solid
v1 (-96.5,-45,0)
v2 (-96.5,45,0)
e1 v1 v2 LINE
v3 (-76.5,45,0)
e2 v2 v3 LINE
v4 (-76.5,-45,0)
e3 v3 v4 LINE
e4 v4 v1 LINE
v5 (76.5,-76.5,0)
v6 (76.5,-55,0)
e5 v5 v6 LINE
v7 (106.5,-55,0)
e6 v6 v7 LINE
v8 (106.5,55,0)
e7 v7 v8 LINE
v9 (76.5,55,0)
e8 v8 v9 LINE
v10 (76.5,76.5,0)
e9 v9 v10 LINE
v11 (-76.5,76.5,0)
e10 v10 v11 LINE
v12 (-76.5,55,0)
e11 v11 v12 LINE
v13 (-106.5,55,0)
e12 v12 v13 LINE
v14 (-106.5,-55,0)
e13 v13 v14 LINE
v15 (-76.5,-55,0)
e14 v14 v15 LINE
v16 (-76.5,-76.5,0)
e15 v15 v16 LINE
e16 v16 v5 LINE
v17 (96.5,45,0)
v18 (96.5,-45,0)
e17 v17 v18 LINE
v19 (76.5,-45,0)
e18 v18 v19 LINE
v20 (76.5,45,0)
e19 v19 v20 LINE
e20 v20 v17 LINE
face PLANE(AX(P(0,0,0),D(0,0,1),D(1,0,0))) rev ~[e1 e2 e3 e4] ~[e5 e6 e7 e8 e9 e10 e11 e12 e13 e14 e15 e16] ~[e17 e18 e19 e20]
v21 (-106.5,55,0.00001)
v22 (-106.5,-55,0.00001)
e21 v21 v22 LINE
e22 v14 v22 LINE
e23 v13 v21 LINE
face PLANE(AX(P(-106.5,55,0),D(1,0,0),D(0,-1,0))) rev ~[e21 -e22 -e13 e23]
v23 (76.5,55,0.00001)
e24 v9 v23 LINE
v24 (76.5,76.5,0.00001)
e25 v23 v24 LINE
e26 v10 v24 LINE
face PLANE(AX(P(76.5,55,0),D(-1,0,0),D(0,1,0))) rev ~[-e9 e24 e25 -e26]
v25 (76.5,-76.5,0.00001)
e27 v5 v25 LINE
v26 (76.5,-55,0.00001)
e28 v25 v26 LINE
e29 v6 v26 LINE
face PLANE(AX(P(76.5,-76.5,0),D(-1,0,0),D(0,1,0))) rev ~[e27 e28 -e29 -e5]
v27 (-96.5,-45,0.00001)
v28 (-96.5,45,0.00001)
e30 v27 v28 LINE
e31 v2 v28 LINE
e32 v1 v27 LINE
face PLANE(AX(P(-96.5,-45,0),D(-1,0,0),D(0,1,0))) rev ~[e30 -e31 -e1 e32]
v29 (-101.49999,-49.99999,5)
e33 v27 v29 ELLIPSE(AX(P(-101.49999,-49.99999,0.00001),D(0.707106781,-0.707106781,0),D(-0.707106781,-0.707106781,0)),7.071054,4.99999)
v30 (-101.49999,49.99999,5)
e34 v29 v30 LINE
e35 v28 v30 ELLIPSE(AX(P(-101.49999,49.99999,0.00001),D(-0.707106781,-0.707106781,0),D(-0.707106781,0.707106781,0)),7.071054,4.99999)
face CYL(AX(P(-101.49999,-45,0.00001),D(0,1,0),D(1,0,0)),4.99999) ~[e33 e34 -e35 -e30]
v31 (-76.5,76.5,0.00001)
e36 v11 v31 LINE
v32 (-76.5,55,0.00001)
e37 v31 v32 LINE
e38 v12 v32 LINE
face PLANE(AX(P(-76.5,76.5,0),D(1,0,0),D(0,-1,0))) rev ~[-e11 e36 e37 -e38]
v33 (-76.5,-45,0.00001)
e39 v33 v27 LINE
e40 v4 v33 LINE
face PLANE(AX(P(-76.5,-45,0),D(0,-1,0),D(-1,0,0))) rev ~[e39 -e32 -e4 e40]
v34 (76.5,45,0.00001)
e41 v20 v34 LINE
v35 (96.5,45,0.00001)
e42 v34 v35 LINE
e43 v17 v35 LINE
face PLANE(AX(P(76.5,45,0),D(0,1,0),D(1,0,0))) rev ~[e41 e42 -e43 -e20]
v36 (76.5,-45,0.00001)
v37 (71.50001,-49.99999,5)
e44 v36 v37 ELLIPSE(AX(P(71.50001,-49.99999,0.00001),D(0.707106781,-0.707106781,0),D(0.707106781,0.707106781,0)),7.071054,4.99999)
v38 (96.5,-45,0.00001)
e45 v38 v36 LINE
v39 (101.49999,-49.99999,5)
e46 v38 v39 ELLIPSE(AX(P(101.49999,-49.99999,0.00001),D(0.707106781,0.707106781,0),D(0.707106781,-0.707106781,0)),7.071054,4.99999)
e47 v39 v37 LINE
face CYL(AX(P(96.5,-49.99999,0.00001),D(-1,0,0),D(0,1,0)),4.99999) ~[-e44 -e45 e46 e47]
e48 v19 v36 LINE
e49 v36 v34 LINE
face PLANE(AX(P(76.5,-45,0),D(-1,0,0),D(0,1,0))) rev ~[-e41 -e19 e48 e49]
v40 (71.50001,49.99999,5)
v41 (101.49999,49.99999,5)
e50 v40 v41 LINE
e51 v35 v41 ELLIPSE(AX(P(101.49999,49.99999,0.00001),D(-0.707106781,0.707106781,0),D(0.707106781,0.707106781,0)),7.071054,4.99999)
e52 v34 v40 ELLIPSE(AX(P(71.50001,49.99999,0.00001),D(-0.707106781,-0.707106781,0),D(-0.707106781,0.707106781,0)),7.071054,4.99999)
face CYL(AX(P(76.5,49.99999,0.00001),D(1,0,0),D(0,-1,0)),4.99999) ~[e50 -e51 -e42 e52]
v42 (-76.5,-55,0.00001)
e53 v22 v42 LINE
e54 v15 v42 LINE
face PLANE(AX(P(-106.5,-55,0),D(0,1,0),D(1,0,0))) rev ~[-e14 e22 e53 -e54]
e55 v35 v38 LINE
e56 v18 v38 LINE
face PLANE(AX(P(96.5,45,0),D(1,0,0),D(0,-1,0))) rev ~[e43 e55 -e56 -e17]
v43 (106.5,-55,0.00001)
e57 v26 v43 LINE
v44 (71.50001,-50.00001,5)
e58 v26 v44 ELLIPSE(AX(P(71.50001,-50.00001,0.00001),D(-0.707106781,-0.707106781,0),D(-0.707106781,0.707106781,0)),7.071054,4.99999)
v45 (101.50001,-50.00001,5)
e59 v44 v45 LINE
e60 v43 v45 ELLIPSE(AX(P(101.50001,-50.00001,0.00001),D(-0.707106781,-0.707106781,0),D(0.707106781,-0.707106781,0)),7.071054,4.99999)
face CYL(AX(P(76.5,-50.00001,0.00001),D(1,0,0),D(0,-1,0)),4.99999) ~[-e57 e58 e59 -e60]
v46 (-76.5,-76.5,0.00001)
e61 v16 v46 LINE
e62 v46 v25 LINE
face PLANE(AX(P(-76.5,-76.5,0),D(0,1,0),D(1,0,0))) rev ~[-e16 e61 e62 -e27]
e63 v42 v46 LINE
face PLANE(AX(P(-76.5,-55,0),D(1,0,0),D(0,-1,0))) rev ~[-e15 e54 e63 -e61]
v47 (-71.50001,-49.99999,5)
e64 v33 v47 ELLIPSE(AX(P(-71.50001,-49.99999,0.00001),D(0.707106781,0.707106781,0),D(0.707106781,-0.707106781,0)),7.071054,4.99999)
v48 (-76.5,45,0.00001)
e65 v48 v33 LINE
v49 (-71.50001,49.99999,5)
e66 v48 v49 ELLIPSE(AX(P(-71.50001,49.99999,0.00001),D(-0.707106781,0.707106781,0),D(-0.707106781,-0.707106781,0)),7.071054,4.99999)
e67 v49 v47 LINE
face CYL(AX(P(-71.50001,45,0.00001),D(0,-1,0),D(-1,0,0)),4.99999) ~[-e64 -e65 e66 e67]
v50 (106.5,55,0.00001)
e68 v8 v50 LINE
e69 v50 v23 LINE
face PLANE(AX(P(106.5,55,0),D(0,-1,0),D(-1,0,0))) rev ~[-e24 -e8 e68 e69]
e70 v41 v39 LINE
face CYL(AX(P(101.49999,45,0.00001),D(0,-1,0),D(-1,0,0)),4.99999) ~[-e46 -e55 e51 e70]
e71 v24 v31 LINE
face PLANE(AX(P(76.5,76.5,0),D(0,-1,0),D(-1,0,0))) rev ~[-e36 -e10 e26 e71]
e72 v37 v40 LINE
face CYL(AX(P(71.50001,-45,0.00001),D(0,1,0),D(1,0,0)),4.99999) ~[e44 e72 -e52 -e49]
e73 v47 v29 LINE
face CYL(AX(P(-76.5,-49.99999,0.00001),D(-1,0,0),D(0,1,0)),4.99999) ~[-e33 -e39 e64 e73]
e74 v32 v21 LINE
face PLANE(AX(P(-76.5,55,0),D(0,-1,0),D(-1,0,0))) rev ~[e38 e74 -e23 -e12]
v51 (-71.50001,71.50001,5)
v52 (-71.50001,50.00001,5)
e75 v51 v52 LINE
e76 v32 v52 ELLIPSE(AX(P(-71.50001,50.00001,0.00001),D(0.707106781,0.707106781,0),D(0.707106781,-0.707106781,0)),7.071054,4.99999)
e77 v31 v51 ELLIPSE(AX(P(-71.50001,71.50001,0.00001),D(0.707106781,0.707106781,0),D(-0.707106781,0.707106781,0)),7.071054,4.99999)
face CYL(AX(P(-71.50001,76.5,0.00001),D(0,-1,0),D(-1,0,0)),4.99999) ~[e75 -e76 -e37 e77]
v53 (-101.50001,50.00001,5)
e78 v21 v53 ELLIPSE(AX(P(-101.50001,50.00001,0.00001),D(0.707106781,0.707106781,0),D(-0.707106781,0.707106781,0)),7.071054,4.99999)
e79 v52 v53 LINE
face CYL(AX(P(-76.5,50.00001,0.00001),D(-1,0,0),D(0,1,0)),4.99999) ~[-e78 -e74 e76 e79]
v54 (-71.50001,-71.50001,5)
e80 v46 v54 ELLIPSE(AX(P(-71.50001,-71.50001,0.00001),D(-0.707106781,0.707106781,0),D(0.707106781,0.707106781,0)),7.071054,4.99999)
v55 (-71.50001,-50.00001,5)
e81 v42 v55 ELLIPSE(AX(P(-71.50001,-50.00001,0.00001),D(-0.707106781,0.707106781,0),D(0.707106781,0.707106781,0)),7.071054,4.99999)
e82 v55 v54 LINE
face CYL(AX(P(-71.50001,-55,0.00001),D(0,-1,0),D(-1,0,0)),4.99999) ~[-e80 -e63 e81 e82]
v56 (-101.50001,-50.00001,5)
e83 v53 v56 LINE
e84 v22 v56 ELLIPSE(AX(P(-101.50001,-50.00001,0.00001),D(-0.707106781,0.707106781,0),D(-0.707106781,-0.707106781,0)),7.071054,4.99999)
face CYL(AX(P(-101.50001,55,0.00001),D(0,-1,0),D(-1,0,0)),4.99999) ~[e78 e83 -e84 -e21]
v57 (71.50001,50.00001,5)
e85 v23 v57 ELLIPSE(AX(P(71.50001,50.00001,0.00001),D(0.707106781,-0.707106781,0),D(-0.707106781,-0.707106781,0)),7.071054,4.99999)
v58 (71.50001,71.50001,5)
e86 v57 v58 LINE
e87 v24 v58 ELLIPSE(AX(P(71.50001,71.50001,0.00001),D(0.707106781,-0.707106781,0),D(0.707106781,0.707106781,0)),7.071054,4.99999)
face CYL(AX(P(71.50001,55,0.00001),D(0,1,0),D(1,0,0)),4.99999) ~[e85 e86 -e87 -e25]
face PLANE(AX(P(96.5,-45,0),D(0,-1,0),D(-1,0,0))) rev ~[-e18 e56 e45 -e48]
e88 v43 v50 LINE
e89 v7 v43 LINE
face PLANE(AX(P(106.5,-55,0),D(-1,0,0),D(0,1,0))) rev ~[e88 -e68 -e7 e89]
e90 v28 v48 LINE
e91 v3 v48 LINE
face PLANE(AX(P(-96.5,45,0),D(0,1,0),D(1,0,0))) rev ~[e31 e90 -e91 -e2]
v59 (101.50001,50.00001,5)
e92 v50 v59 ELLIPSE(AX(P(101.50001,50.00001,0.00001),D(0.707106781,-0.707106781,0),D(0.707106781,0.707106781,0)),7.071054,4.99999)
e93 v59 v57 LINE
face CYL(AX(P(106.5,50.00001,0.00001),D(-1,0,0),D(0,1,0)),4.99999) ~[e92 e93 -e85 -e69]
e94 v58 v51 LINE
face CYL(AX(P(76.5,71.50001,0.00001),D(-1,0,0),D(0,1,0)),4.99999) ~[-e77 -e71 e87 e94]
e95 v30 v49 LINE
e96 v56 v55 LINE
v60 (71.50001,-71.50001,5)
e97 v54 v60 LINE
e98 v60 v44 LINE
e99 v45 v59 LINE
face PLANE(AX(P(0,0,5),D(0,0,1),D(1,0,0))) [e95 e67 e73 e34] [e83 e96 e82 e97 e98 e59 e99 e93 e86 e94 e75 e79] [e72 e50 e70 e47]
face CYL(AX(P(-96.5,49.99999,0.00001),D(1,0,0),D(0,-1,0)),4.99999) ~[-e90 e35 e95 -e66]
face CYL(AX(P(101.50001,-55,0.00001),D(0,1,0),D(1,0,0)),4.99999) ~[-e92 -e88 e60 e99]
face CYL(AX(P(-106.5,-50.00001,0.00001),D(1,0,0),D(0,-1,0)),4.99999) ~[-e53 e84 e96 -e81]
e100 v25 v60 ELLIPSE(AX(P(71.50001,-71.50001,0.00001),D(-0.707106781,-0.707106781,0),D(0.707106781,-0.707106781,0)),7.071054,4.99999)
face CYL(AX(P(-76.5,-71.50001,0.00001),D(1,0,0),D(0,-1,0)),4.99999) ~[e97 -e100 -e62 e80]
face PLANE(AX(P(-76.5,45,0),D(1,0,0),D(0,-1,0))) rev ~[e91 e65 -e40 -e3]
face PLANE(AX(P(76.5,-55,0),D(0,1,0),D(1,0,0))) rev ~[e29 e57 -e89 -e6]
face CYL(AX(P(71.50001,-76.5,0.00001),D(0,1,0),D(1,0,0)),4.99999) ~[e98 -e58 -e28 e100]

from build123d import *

# Parameters (mm, degrees)
F2_DEPTH = 5
F3_R     = 4.99999


# Not quite as in the source:
# - a fillet or chamfer is up to 0.001 mm smaller than in the source, because OpenCascade refuses the exact size


with BuildPart() as f2:
    # F1 (on Top) → F2 (new body)
    with BuildSketch(Plane.XY):
        Polygon((-76.5, -76.5), (76.5, -76.5), (76.5, -55), (76.5, -45), (76.5, 45), (76.5, 55), (76.5, 76.5), (-76.5, 76.5), (-76.5, 55), (-76.5, 45), (-76.5, -45), (-76.5, -55), align=None)
        Polygon((76.5, -45), (76.5, -55), (106.5, -55), (106.5, 55), (76.5, 55), (76.5, 45), (96.5, 45), (96.5, -45), align=None)
        Polygon((-106.5, -55), (-76.5, -55), (-76.5, -45), (-96.5, -45), (-96.5, 45), (-76.5, 45), (-76.5, 55), (-106.5, 55), align=None)
    extrude(amount=F2_DEPTH)

    # F3 (radius 5 in the source; OpenCascade refuses exactly that, so slightly less here)
    f3_edges = [f2.edges().sort_by_distance(p)[0] for p in [
        (0, -76.5, 5),
        (76.5, -65.75, 5),
        (91.5, -55, 5),
        (106.5, 0, 5),
        (91.5, 55, 5),
        (76.5, 65.75, 5),
        (0, 76.5, 5),
        (-76.5, 65.75, 5),
        (-91.5, 55, 5),
        (-106.5, 0, 5),
        (-91.5, -55, 5),
        (-76.5, -65.75, 5),
        (-76.5, 0, 5),
        (-86.5, -45, 5),
        (-96.5, 0, 5),
        (-86.5, 45, 5),
        (76.5, 0, 5),
        (86.5, 45, 5),
        (96.5, 0, 5),
        (86.5, -45, 5),
    ]]
    fillet(f3_edges, radius=F3_R)


solid = f2.part
